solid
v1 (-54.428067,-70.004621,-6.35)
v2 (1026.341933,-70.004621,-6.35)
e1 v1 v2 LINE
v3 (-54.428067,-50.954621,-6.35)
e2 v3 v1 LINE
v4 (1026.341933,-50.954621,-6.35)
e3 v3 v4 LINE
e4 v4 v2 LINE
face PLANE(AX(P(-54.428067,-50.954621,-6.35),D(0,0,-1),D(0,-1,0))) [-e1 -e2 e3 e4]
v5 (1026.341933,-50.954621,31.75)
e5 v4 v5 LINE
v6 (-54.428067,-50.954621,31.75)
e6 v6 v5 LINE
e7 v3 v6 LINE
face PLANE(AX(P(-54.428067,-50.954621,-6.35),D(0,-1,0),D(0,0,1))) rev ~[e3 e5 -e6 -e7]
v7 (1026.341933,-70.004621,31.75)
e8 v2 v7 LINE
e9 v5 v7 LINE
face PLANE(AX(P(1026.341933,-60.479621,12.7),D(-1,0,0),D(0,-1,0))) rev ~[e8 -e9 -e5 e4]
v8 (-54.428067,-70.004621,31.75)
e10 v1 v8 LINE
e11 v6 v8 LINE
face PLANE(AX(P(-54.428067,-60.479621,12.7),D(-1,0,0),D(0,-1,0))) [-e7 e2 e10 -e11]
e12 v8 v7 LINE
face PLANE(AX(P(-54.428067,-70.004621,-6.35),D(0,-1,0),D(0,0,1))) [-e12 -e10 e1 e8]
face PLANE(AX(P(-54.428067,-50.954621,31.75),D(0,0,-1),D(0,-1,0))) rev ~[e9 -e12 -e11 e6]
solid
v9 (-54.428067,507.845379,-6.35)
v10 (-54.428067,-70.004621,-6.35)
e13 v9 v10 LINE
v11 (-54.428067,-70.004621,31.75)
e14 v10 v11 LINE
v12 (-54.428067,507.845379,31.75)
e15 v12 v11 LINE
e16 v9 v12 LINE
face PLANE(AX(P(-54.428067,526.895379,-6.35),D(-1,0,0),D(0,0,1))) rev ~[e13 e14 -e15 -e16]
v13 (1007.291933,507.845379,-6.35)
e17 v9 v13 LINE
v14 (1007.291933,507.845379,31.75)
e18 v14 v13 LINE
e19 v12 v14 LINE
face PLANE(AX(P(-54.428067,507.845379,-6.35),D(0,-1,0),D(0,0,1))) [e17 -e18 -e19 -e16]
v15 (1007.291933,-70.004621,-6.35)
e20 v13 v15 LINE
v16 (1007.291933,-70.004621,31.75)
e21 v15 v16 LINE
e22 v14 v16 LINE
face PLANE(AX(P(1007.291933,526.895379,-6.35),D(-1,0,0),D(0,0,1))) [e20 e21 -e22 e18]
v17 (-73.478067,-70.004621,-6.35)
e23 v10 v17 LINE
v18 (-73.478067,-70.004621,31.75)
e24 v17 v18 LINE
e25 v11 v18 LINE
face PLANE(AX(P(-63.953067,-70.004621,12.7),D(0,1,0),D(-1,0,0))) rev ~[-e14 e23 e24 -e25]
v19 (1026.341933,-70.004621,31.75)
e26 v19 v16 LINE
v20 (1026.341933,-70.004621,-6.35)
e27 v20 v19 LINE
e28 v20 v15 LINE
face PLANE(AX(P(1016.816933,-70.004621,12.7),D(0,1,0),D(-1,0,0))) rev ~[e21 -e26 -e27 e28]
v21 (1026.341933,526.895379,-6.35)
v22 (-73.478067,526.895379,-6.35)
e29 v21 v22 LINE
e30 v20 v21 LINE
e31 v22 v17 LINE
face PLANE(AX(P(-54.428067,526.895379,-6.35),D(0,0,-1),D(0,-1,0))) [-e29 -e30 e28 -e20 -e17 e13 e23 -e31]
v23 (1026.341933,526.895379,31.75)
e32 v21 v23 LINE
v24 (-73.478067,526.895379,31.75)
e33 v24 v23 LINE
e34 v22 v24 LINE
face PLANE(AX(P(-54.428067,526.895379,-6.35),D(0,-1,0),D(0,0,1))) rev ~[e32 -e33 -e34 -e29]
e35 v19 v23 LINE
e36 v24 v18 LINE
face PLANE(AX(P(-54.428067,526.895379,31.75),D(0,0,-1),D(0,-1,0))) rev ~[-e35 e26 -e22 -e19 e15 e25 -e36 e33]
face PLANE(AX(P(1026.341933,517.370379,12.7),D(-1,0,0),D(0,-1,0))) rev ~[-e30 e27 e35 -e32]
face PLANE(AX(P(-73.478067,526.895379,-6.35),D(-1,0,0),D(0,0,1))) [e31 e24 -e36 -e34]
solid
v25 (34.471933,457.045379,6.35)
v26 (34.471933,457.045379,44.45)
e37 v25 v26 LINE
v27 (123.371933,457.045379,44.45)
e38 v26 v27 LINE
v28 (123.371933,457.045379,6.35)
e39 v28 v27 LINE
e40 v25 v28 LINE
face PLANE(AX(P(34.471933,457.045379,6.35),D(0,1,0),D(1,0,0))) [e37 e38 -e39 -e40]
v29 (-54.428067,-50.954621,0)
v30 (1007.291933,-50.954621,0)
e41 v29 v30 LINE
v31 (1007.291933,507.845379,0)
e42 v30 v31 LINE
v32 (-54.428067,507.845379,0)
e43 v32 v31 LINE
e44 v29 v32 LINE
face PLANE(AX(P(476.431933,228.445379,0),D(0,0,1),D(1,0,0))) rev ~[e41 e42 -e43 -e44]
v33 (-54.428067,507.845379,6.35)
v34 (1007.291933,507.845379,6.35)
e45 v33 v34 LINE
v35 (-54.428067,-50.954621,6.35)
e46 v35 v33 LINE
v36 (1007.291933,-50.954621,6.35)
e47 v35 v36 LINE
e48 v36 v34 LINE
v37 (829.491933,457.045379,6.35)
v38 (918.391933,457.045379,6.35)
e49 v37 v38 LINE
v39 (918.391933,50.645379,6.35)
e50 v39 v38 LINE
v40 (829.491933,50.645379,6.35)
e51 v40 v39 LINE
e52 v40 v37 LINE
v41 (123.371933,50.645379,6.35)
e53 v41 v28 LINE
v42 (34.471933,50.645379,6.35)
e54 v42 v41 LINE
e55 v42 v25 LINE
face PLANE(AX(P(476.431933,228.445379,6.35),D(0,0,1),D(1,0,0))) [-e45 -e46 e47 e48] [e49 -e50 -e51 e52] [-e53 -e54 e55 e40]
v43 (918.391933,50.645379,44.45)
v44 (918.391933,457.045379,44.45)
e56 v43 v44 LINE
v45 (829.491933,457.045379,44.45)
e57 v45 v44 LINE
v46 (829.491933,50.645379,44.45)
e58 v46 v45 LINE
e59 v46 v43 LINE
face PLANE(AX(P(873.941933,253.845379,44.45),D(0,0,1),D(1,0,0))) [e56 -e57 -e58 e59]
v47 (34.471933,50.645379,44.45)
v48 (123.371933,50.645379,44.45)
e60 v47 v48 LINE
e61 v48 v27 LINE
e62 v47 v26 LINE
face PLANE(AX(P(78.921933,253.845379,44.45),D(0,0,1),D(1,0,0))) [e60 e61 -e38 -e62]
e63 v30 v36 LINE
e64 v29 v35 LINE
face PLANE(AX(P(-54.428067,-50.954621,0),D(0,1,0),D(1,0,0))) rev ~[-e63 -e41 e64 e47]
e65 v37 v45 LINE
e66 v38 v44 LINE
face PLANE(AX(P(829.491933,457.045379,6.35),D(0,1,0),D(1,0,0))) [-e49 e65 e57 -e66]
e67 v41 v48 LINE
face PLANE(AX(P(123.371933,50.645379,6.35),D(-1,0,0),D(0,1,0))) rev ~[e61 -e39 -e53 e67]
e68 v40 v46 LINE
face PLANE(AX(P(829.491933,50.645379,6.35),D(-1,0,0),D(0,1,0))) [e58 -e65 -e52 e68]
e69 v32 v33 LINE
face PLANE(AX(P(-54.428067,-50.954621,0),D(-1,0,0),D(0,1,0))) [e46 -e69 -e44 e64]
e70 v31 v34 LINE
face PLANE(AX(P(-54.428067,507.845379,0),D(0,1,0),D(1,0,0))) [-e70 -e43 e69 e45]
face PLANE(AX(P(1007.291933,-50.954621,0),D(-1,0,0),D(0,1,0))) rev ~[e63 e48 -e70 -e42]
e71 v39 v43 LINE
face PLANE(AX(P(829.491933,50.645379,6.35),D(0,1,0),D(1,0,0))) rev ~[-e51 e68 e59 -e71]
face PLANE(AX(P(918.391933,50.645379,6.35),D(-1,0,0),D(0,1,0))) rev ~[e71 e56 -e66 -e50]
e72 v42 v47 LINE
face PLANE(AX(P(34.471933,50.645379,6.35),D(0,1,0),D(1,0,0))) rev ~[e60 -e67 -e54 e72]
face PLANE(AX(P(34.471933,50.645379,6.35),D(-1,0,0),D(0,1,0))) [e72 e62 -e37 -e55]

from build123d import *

# Parameters (mm, degrees)
F0_W     = 1061.72
F0_H     = 558.8
F1_DEPTH = 6.35
F2_W     = 19.05
F2_H     = 38.1
F3_DEPTH = 1080.77
F4_W     = 19.05
F4_H     = 38.1
F5_DEPTH = 596.9
F6_W     = 88.9
F6_H     = 406.4
F7_DEPTH = 38.1


with BuildPart() as f1:
    # F0 (on Top) → F1 (new body)
    with BuildSketch(Plane.XY):
        with Locations((476.4319329417, 228.4453787148)):
            Rectangle(F0_W, F0_H)
    extrude(amount=F1_DEPTH)

    # F6 (on face) → F7 (join)
    with BuildSketch(Plane.XY.offset(6.35)):
        with Locations((78.9219329417, 253.8453787148)):
            Rectangle(F6_W, F6_H)
        with Locations((873.9419329417, 253.8453787148)):
            Rectangle(F6_W, F6_H)
    extrude(amount=F7_DEPTH)


with BuildPart() as f3:
    # F2 (on face) → F3 (new body)
    with BuildSketch(Plane(origin=(-54.4280670583, 0, 0), x_dir=(0, -1, 0), z_dir=(-1, 0, 0))):
        with Locations((-517.3703787148, 12.7)):
            Rectangle(F2_W, F2_H)
    extrude(amount=-F3_DEPTH)

    # F4 (on face) → F5 (join)
    with BuildSketch(Plane(origin=(0, 526.8953787148, 0), x_dir=(-1, 0, 0), z_dir=(0, 1, 0))):
        with Locations((-1016.8169329417, 12.7)):
            Rectangle(F4_W, F4_H)
        with Locations((63.9530670583, 12.7)):
            Rectangle(F4_W, F4_H)
    extrude(amount=-F5_DEPTH)


with BuildPart() as f3b:
    # F2 (on face) → F3, piece 2 (new body)
    with BuildSketch(Plane(origin=(-54.4280670583, 0, 0), x_dir=(0, -1, 0), z_dir=(-1, 0, 0))):
        with Locations((60.4796212852, 12.7)):
            Rectangle(F2_W, F2_H)
    extrude(amount=-F3_DEPTH)


solid = Compound([f1.part, f3.part, f3b.part])
